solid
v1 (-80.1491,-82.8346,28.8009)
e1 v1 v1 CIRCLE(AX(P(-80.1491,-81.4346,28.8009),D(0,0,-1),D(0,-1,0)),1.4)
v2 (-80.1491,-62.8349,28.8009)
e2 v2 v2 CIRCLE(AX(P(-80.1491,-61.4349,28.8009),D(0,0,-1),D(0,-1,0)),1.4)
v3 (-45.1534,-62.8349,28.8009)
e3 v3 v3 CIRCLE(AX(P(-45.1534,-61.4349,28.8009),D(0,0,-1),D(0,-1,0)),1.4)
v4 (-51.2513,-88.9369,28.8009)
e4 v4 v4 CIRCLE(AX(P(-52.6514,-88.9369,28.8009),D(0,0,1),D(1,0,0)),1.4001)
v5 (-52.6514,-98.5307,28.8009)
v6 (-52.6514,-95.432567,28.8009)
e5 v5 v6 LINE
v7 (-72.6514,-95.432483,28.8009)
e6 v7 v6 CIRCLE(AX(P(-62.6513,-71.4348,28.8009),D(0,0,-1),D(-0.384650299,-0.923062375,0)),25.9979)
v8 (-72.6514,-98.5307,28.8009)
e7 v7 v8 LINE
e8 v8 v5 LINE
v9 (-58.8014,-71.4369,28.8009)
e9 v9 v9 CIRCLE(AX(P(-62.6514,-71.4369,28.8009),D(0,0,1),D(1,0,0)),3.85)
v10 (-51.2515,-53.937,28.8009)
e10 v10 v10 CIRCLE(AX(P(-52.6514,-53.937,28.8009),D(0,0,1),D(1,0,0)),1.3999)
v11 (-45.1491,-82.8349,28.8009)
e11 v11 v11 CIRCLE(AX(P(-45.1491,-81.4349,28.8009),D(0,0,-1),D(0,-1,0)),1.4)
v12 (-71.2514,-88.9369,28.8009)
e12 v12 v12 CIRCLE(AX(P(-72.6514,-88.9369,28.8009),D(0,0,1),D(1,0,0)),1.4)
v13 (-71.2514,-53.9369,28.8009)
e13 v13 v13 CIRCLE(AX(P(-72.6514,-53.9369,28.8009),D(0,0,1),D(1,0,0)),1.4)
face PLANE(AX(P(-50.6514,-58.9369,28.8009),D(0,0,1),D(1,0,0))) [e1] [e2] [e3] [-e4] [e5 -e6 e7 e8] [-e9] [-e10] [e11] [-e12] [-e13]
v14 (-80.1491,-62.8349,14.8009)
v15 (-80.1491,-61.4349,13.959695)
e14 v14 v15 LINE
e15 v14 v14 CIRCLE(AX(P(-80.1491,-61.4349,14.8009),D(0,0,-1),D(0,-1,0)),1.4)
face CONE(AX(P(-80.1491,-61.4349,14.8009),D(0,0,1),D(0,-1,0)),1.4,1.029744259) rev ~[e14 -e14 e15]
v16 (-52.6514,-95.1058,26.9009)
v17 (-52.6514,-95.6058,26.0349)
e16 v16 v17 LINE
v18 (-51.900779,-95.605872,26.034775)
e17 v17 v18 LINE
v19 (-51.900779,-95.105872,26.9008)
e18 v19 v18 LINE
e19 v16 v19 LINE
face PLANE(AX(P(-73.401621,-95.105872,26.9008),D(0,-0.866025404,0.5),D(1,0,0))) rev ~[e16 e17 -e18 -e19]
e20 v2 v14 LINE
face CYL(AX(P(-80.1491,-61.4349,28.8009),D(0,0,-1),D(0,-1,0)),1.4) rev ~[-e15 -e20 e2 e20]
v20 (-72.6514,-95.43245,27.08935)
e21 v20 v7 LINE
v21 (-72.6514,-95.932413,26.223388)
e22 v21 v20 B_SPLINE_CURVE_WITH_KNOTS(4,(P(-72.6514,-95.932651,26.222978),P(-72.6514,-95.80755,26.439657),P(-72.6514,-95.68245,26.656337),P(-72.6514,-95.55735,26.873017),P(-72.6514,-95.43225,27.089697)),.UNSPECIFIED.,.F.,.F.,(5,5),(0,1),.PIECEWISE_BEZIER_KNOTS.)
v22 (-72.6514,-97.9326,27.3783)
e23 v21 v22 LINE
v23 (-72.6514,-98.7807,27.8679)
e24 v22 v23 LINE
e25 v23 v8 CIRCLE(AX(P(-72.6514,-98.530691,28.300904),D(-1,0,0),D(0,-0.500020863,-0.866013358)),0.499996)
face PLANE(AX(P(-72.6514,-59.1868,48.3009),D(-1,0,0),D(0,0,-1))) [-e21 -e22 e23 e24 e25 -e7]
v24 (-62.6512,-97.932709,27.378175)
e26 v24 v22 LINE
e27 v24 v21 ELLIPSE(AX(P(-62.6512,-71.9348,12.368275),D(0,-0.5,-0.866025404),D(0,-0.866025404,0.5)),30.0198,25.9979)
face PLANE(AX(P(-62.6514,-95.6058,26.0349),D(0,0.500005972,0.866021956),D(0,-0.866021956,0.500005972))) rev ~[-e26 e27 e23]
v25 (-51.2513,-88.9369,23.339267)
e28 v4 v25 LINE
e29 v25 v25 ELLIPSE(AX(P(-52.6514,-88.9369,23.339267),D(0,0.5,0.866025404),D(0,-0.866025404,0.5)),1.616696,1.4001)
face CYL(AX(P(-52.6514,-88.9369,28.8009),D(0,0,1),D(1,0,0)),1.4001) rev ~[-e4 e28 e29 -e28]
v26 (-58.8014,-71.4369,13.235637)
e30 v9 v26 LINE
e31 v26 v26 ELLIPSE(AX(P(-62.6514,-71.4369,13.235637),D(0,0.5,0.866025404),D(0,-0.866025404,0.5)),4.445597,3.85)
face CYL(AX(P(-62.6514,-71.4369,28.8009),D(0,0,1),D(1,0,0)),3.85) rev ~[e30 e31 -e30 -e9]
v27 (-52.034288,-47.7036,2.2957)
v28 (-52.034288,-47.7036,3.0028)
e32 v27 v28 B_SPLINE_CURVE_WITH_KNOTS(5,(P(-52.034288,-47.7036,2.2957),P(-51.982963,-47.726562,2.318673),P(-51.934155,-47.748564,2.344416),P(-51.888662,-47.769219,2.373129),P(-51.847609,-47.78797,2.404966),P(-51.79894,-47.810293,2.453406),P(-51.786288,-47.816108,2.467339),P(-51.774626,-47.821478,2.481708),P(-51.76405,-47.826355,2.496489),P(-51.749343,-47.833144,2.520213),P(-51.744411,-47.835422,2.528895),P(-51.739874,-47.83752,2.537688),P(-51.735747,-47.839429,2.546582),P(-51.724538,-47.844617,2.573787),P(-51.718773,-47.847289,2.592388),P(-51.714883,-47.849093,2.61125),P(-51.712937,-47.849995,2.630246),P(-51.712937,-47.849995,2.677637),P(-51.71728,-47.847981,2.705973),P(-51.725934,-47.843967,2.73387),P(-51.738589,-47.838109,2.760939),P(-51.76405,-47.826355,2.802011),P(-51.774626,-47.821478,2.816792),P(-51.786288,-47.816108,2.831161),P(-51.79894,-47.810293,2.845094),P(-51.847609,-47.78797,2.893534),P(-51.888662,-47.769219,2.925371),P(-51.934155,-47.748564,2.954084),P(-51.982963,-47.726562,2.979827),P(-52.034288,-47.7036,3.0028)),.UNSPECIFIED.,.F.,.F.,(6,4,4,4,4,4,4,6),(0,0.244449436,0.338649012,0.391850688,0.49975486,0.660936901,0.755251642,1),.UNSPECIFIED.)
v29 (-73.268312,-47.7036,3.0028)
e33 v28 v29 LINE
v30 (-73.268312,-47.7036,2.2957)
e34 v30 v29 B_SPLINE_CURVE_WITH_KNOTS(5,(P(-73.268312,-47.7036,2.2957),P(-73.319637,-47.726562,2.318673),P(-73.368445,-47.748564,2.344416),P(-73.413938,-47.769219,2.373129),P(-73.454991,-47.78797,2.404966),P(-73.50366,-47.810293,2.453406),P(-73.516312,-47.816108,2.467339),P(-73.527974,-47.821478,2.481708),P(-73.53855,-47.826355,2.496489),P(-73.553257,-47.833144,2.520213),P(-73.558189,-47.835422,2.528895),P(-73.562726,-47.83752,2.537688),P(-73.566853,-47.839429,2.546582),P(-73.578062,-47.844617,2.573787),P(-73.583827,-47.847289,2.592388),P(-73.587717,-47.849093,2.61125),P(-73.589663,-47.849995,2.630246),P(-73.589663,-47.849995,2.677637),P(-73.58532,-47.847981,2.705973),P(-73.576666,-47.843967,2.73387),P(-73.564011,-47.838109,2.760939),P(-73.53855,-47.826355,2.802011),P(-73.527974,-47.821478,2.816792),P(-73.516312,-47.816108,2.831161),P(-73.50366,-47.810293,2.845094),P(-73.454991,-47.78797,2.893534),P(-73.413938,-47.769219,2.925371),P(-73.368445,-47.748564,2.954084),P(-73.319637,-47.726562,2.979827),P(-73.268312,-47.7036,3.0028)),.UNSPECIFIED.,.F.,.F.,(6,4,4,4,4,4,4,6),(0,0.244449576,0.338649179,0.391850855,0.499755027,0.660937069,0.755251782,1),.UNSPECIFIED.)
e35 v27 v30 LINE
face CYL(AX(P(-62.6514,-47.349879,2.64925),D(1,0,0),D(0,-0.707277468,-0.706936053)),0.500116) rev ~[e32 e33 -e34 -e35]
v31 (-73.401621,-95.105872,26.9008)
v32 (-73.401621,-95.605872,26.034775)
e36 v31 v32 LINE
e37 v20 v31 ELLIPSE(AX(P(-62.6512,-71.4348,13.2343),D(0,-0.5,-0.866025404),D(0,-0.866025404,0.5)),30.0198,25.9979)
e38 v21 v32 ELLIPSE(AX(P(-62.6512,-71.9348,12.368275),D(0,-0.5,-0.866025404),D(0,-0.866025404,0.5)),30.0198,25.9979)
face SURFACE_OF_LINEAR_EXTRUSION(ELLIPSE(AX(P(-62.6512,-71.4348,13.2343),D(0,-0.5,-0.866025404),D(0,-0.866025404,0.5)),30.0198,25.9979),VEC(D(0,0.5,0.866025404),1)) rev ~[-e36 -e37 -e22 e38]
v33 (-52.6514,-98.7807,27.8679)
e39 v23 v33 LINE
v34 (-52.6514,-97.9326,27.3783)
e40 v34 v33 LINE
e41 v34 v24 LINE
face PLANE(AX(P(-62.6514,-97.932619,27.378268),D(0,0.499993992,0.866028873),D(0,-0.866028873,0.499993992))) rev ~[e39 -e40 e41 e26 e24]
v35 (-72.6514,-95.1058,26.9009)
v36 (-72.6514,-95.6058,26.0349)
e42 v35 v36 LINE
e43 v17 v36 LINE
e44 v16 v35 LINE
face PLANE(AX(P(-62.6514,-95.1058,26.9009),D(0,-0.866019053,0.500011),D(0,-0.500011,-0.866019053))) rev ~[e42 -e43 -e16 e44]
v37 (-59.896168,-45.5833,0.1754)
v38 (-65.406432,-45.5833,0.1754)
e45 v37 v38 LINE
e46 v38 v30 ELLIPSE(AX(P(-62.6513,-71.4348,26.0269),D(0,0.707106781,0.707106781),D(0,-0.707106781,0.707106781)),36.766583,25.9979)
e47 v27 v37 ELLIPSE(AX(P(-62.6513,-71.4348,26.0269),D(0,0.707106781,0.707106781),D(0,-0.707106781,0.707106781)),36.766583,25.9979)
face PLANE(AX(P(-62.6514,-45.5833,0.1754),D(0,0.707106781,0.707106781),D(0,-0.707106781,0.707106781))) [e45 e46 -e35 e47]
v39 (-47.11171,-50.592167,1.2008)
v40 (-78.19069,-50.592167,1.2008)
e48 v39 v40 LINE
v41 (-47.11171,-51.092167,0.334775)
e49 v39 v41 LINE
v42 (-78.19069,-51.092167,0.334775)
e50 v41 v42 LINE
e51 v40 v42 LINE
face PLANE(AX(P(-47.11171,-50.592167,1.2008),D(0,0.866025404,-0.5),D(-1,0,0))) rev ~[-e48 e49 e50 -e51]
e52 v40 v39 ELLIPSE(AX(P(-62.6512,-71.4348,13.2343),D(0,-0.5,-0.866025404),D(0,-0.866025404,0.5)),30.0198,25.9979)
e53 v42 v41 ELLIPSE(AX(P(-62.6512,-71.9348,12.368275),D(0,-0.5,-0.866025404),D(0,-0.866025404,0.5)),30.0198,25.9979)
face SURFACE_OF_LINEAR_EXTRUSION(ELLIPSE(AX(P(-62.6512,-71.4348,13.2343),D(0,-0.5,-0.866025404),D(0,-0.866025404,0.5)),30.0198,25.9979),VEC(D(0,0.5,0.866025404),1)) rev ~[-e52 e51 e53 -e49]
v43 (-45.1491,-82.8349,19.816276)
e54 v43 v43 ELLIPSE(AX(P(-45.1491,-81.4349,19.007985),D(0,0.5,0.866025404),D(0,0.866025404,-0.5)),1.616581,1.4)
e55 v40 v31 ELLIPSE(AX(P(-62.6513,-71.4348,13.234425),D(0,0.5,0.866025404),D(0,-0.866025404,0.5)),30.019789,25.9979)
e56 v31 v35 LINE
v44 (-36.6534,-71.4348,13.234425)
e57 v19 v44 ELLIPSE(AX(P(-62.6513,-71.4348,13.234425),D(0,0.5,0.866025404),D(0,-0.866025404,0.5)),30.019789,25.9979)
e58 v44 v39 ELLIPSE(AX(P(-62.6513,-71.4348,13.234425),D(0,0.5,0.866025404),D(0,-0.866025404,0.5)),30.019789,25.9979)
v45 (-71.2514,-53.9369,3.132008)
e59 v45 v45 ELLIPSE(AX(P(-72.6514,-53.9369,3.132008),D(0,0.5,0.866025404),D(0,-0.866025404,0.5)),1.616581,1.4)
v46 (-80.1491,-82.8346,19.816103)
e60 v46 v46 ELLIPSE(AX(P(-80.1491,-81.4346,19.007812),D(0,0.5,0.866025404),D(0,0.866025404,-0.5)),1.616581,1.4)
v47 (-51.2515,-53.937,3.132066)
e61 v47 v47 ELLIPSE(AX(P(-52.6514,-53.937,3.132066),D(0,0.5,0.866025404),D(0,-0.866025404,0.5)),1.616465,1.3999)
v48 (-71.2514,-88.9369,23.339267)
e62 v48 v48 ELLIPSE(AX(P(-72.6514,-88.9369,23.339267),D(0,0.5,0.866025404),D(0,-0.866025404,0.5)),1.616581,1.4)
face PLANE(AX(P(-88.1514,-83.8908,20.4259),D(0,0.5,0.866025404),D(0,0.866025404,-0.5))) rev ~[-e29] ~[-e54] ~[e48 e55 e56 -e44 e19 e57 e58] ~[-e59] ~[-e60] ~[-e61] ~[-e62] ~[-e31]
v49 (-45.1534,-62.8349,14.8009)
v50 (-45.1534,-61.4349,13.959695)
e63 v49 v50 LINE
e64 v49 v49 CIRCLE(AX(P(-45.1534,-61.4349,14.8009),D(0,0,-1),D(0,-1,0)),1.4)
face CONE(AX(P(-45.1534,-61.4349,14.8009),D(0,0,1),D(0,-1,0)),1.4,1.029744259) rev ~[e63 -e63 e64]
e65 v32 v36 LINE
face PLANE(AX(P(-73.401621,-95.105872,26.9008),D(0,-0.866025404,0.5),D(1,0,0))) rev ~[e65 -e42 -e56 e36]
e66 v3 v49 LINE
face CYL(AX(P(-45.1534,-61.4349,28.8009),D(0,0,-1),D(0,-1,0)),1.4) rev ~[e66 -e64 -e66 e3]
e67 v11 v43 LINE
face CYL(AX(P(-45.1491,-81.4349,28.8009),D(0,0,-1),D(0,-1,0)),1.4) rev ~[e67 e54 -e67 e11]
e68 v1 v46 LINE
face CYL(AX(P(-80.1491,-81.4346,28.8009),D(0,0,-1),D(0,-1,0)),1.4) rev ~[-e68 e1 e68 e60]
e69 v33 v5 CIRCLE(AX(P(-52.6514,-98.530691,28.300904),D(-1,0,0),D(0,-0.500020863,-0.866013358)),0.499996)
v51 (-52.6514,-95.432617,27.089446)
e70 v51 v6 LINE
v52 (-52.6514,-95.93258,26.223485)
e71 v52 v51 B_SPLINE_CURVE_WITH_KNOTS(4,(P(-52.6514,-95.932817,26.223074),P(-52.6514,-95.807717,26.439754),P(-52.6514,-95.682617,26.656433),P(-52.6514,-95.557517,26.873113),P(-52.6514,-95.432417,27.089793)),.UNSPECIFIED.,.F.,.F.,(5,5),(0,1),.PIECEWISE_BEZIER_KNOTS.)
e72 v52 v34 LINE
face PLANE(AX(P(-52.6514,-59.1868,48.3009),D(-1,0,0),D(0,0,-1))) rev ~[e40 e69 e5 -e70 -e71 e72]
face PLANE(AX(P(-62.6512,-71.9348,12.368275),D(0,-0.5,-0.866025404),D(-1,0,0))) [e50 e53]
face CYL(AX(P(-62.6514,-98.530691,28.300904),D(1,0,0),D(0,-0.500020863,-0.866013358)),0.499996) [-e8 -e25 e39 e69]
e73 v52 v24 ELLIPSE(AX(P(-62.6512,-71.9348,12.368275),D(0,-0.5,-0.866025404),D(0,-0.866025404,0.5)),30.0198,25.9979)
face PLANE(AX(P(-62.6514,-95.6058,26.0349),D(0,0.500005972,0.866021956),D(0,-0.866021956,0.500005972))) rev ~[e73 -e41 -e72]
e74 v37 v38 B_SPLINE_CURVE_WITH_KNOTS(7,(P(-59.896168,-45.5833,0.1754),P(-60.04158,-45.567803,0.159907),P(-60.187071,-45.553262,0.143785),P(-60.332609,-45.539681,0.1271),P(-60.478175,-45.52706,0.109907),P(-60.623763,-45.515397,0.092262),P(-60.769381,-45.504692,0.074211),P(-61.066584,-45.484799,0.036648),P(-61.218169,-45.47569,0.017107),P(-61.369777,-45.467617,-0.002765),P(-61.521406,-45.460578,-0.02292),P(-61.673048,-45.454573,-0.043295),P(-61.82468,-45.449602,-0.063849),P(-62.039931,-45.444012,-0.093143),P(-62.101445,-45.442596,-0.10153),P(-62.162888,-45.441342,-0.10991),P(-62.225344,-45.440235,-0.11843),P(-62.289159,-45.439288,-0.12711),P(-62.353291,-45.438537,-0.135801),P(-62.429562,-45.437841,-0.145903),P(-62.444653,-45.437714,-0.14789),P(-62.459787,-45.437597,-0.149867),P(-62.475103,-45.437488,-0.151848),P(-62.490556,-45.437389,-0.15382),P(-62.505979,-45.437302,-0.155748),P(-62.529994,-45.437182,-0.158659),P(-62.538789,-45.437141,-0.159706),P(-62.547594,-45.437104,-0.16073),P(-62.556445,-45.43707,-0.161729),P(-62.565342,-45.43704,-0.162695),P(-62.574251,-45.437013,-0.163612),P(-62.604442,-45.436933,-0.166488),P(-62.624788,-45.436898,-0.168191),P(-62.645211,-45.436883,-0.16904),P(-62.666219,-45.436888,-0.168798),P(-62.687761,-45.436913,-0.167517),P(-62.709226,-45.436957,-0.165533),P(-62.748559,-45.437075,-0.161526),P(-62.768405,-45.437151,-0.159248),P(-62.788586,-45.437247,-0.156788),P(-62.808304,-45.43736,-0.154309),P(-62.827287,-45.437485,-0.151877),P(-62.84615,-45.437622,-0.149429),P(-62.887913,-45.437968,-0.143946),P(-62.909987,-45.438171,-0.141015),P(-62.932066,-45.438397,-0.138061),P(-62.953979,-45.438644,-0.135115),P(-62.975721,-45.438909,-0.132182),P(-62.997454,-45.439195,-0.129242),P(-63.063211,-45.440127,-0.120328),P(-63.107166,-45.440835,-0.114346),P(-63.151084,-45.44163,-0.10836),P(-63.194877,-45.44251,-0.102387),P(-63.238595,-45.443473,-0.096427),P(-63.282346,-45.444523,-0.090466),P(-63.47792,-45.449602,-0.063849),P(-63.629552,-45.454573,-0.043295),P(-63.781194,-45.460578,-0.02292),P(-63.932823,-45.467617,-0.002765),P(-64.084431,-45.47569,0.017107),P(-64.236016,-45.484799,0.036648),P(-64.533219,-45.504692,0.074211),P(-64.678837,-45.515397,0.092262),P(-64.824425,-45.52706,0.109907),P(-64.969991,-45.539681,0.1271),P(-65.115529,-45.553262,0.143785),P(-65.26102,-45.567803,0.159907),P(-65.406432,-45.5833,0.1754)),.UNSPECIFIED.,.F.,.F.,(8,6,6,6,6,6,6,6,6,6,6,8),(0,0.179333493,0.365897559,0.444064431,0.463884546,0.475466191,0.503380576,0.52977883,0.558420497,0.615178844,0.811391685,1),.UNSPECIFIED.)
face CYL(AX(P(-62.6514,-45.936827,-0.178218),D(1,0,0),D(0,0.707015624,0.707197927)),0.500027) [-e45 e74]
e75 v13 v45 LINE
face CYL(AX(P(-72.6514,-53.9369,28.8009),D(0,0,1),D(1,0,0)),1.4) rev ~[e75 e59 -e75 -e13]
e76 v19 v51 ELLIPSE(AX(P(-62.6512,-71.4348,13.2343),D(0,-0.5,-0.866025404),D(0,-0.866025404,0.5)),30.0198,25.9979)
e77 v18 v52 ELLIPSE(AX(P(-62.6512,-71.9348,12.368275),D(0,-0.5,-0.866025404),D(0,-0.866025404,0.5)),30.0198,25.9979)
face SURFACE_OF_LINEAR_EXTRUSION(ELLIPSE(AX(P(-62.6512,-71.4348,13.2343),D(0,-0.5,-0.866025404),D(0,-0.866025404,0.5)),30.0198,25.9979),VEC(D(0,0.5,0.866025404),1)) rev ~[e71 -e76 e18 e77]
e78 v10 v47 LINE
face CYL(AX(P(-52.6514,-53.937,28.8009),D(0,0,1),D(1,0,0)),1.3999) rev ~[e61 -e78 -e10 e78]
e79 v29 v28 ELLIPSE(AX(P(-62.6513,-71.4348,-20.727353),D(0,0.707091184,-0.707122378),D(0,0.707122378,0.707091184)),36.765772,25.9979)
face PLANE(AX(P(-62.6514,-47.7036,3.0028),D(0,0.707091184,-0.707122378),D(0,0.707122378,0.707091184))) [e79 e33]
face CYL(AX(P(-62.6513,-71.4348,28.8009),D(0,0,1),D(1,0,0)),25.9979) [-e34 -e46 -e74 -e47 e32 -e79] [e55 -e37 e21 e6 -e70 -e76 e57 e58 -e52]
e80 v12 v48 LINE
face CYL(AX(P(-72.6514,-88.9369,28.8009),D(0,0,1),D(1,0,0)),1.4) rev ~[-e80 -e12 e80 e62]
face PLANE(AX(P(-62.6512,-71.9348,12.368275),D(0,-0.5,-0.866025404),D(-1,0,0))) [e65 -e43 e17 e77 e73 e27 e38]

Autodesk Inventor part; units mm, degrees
ref_plane "YZ Plane" through (0, 0, 0) normal (1, 0, 0) x (0, 1, 0)
ref_plane "XZ Plane" through (0, 0, 0) normal (0, 1, 0) x (-1, 0, 0)
ref_plane "Work Plane1" through (-54.6514, -58.9369, 28.8009) normal (0, 0, -1) x (-1, 0, 0)
ref_plane "Arbeitsebene5" through (-88.1514, -83.8908, 20.4259) normal (0, 0.5, 0.8660254) x (1, 0, 0)
sketch "Sketch1" plane through (-50.6514, -58.9369, 28.8009) normal (0, 0, 1) x (1, 0, 0)
  circle A0 centre (-11.9999, -12.4979) radius 25.9979 projected
  circle A1 centre (-2, 4.9999) radius 1.3999 projected
  circle A2 centre (-22, 5) radius 1.4 projected
  circle A3 centre (-12, -12.5) radius 3.85 projected
  line L0 (-5, -5) -> (-5, 0) projected
  line L1 (0, 0) -> (0, -5) projected
  circle A4 centre (-22, -30) radius 1.4 projected
  circle A5 centre (-2, -30) radius 1.4001 projected
  line L2 (-5, 0) -> (0, 0)
  line L3 (0, 0) -> (0, -5)
  line L4 (0, -5) -> (-5, -5)
  line L5 (-5, -5) -> (-5, 0)
  circle A6 centre (-12, -12.5) radius 4
  point P0 (50.6514, 58.9369)
  dimension "d2" = 8
extrude "Extrusion1" add sketch "Sketch1" against normal up to surface contours A0 | L0 L2 L1 L4 | A6 surface through (-88.1514, -83.8908, 20.4259) normal (0, 0.5, 0.8660254)
sketch "Skizze17" plane through (-62.6512, -71.4348, 13.2343) normal (0, -0.5, -0.8660254) x (-1, 0, 0)
  line L0 (23.5002, 23.867) -> (-23.4998, 23.867) projected
  arc A0 (-23.4998, 23.867) -> (-25.4998, 21.867) centre (-23.4998, 21.867) ccw projected
  line L1 (-25.4998, 21.867) -> (-25.4998, -25.133) projected
  arc A1 (-25.4998, -25.133) -> (-23.4998, -27.133) centre (-23.4998, -25.133) ccw projected
  line L2 (-23.4998, -27.133) -> (23.5002, -27.133) projected
  arc A2 (23.5002, -27.133) -> (25.5002, -25.133) centre (23.5002, -25.133) ccw projected
  line L3 (25.5002, -25.133) -> (25.5002, 21.867) projected
  arc A3 (25.5002, 21.867) -> (23.5002, 23.867) centre (23.5002, 21.867) ccw projected
  line L4 (-17.4998, 11.367) -> (17.5002, 11.367) projected
  line L5 (17.5002, 11.367) -> (17.5002, -12.633) projected
  line L6 (17.5002, -12.633) -> (-17.4998, -12.633) projected
  line L7 (-17.4998, -12.633) -> (-17.4998, 11.367) projected
  line L8 (-23.4998, 24.067) -> (23.5002, 24.067)
  arc A4 (25.7002, 21.867) -> (23.5002, 24.067) centre (23.5002, 21.867) ccw
  line L9 (25.7002, 21.867) -> (25.7002, -25.133)
  arc A5 (23.5002, -27.333) -> (25.7002, -25.133) centre (23.5002, -25.133) ccw
  line L10 (23.5002, -27.333) -> (-23.4998, -27.333)
  arc A6 (-25.6998, -25.133) -> (-23.4998, -27.333) centre (-23.4998, -25.133) ccw
  line L11 (-25.6998, -25.133) -> (-25.6998, 21.867)
  arc A7 (-23.4998, 24.067) -> (-25.6998, 21.867) centre (-23.4998, 21.867) ccw
  ellipse E0 centre (-9.9998, 20.2048) end of major axis (-9.9998, 21.8213) minor radius 1.3999 projected
  ellipse E1 centre (10.0001, 20.2048) end of major axis (10.0001, 21.8213) minor radius 1.4 projected
  ellipse E2 centre (0.0001, -0.0025) end of major axis (0.0001, 4.4432) minor radius 3.85 projected
  ellipse E3 centre (10.0001, -20.2097) end of major axis (10.0001, -18.5931) minor radius 1.4 projected
  ellipse E4 centre (-9.9999, -20.2096) end of major axis (-9.9999, -18.593) minor radius 1.4001 projected
  ellipse E5 centre (0, 0) end of major axis (0, -30.0198) minor radius 25.9979 projected
  point P0 (-62.6512, 68.4815)
  point P1 (15.5395, 24.067)
  point P2 (-15.5395, 24.067)
  point P3 (10.7503, -27.333)
  point P4 (-10.7503, -27.333)
  dimension "d65" = 0.2
extrude "Extrusion13" add sketch "Skizze17" along normal blind 1 contours L8 E5 | E5 L10
ref_plane "Arbeitsebene6" through (-62.6514, -59.1868, 48.3009) normal (-1, 0, 0) x (0, 0, -1)
sketch "Skizze18" plane through (-62.6514, -59.1868, 48.3009) normal (-1, 0, 0) x (0, 0, -1)
  line L0 (47.1, -8.5947) -> (47.1, -8.5947) projected
  line L1 (47.1, -8.5947) -> (47.966, -8.0947) projected
  line L2 (47.966, -8.0947) -> (47.966, -8.0947) projected
  line L3 (47.1, -8.5947) -> (47.966, -8.0947) projected
  line L4 (21.4, 35.919) -> (21.4, 35.919) projected
  line L5 (21.4, 35.919) -> (22.266, 36.419) projected
  line L6 (22.266, 36.419) -> (22.266, 36.419) projected
  line L7 (21.4, 35.919) -> (22.266, 36.419) projected
  line L8 (21.4, 35.919) -> (22.266, 36.419) projected
  line L9 (22.266, 36.419) -> (19.5, 34.8221)
  line L10 (19.5, 38.2458) -> (19.5, -13.75) projected
  line L11 (22.266, 36.419) -> (19.5, 34.8221)
  line L12 (22.266, 36.419) -> (20.9226, 38.7458) projected
  line L13 (22.266, 36.419) -> (20.433, 39.5939)
  line L14 (19.5, 39.3439) -> (19.5, 34.8221)
  arc A0 (20.433, 39.5939) -> (19.5, 39.3439) centre (20, 39.3439) ccw
  point P0 (48.3009, -59.1868)
  point P1 (19.5, 38.2458)
  point P2 (20.9226, 38.7458)
  dimension "d68" = 0.5
extrude "Extrusion14" add sketch "Skizze18" along normal mid plane 20
sketch "Skizze19" plane through (-62.6514, -59.1868, 48.3009) normal (-1, 0, 0) x (0, 0, -1)
  line L0 (47.1, -8.5947) -> (47.1, -8.5947) projected
  line L1 (47.1, -8.5947) -> (47.966, -8.0947) projected
  line L2 (47.966, -8.0947) -> (47.966, -8.0947) projected
  line L3 (47.1, -8.5947) -> (47.966, -8.0947) projected
  line L4 (48.1255, -13.6035) -> (46.0052, -11.4832)
  line L5 (48.4791, -13.75) -> (51.4776, -13.75) construction
  line L6 (45.2981, -11.4832) -> (43.0314, -13.75)
  line L7 (19.5, -13.75) -> (50.0764, -13.75) projected
  line L8 (43.0314, -13.75) -> (48.272, -13.75)
  arc A0 (46.0052, -11.4832) -> (45.2981, -11.4832) centre (45.6517, -11.8368) ccw
  arc A1 (48.1255, -13.6035) -> (48.4791, -13.75) centre (48.4791, -13.25) ccw
  point P0 (48.3009, -59.1868)
  point P1 (48.4791, -13.75)
  dimension "d71" = 135
  dimension "d72" = 90
  dimension "d73" = 0.5
extrude "Extrusion15" cut sketch "Skizze19" along normal through all both and the other way through all
sketch "Skizze20" plane through (-50.6514, -58.9369, 28.8009) normal (0, 0, 1) x (1, 0, 0)
  circle A0 centre (-29.4977, -2.4981) radius 1.3999
  circle A1 centre (-29.4977, -22.498) radius 1.4
  circle A2 centre (-11.9977, -12.498) radius 3.85
  circle A3 centre (5.5022, -22.498) radius 1.4
  circle A4 centre (5.5022, -2.498) radius 1.4001
  arc A5 (-2.0001, -36.4957) -> (-22.0001, -36.4955) centre (-11.9999, -12.4979) ccw
  line L0 (-22.0001, -39.5939) -> (-22.0001, -36.4955)
  line L1 (-22.0001, -39.5939) -> (-2.0001, -39.5939)
  line L2 (-2.0001, -36.4957) -> (-2.0001, -39.5939)
  line L3 (5.498, -22.4977) -> (5.498, -2.4981)
  line L4 (5.498, -2.4981) -> (-29.4977, -2.4981)
  line L5 (-29.4977, -2.4981) -> (-29.4977, -22.4977)
  line L6 (-29.4977, -22.4977) -> (5.498, -22.4977)
  line L7 (5.498, -22.4977) -> (-29.4977, -2.4981) construction
  line L8 (5.498, -2.4981) -> (-29.4977, -22.4977) construction
  point P0 (50.6514, 58.9369)
hole "Bohrung3" at (-80.1491, -61.4349, 28.8009) at (-80.1491, -81.4346, 28.8009) at (-45.1491, -81.4349, 28.8009) at (-45.1534, -61.4349, 28.8009) direction (0, 0, -1) diameter 2.8 depth 14 tip angle 118
properties part number "Spectrometer_gratingholder_v0"
